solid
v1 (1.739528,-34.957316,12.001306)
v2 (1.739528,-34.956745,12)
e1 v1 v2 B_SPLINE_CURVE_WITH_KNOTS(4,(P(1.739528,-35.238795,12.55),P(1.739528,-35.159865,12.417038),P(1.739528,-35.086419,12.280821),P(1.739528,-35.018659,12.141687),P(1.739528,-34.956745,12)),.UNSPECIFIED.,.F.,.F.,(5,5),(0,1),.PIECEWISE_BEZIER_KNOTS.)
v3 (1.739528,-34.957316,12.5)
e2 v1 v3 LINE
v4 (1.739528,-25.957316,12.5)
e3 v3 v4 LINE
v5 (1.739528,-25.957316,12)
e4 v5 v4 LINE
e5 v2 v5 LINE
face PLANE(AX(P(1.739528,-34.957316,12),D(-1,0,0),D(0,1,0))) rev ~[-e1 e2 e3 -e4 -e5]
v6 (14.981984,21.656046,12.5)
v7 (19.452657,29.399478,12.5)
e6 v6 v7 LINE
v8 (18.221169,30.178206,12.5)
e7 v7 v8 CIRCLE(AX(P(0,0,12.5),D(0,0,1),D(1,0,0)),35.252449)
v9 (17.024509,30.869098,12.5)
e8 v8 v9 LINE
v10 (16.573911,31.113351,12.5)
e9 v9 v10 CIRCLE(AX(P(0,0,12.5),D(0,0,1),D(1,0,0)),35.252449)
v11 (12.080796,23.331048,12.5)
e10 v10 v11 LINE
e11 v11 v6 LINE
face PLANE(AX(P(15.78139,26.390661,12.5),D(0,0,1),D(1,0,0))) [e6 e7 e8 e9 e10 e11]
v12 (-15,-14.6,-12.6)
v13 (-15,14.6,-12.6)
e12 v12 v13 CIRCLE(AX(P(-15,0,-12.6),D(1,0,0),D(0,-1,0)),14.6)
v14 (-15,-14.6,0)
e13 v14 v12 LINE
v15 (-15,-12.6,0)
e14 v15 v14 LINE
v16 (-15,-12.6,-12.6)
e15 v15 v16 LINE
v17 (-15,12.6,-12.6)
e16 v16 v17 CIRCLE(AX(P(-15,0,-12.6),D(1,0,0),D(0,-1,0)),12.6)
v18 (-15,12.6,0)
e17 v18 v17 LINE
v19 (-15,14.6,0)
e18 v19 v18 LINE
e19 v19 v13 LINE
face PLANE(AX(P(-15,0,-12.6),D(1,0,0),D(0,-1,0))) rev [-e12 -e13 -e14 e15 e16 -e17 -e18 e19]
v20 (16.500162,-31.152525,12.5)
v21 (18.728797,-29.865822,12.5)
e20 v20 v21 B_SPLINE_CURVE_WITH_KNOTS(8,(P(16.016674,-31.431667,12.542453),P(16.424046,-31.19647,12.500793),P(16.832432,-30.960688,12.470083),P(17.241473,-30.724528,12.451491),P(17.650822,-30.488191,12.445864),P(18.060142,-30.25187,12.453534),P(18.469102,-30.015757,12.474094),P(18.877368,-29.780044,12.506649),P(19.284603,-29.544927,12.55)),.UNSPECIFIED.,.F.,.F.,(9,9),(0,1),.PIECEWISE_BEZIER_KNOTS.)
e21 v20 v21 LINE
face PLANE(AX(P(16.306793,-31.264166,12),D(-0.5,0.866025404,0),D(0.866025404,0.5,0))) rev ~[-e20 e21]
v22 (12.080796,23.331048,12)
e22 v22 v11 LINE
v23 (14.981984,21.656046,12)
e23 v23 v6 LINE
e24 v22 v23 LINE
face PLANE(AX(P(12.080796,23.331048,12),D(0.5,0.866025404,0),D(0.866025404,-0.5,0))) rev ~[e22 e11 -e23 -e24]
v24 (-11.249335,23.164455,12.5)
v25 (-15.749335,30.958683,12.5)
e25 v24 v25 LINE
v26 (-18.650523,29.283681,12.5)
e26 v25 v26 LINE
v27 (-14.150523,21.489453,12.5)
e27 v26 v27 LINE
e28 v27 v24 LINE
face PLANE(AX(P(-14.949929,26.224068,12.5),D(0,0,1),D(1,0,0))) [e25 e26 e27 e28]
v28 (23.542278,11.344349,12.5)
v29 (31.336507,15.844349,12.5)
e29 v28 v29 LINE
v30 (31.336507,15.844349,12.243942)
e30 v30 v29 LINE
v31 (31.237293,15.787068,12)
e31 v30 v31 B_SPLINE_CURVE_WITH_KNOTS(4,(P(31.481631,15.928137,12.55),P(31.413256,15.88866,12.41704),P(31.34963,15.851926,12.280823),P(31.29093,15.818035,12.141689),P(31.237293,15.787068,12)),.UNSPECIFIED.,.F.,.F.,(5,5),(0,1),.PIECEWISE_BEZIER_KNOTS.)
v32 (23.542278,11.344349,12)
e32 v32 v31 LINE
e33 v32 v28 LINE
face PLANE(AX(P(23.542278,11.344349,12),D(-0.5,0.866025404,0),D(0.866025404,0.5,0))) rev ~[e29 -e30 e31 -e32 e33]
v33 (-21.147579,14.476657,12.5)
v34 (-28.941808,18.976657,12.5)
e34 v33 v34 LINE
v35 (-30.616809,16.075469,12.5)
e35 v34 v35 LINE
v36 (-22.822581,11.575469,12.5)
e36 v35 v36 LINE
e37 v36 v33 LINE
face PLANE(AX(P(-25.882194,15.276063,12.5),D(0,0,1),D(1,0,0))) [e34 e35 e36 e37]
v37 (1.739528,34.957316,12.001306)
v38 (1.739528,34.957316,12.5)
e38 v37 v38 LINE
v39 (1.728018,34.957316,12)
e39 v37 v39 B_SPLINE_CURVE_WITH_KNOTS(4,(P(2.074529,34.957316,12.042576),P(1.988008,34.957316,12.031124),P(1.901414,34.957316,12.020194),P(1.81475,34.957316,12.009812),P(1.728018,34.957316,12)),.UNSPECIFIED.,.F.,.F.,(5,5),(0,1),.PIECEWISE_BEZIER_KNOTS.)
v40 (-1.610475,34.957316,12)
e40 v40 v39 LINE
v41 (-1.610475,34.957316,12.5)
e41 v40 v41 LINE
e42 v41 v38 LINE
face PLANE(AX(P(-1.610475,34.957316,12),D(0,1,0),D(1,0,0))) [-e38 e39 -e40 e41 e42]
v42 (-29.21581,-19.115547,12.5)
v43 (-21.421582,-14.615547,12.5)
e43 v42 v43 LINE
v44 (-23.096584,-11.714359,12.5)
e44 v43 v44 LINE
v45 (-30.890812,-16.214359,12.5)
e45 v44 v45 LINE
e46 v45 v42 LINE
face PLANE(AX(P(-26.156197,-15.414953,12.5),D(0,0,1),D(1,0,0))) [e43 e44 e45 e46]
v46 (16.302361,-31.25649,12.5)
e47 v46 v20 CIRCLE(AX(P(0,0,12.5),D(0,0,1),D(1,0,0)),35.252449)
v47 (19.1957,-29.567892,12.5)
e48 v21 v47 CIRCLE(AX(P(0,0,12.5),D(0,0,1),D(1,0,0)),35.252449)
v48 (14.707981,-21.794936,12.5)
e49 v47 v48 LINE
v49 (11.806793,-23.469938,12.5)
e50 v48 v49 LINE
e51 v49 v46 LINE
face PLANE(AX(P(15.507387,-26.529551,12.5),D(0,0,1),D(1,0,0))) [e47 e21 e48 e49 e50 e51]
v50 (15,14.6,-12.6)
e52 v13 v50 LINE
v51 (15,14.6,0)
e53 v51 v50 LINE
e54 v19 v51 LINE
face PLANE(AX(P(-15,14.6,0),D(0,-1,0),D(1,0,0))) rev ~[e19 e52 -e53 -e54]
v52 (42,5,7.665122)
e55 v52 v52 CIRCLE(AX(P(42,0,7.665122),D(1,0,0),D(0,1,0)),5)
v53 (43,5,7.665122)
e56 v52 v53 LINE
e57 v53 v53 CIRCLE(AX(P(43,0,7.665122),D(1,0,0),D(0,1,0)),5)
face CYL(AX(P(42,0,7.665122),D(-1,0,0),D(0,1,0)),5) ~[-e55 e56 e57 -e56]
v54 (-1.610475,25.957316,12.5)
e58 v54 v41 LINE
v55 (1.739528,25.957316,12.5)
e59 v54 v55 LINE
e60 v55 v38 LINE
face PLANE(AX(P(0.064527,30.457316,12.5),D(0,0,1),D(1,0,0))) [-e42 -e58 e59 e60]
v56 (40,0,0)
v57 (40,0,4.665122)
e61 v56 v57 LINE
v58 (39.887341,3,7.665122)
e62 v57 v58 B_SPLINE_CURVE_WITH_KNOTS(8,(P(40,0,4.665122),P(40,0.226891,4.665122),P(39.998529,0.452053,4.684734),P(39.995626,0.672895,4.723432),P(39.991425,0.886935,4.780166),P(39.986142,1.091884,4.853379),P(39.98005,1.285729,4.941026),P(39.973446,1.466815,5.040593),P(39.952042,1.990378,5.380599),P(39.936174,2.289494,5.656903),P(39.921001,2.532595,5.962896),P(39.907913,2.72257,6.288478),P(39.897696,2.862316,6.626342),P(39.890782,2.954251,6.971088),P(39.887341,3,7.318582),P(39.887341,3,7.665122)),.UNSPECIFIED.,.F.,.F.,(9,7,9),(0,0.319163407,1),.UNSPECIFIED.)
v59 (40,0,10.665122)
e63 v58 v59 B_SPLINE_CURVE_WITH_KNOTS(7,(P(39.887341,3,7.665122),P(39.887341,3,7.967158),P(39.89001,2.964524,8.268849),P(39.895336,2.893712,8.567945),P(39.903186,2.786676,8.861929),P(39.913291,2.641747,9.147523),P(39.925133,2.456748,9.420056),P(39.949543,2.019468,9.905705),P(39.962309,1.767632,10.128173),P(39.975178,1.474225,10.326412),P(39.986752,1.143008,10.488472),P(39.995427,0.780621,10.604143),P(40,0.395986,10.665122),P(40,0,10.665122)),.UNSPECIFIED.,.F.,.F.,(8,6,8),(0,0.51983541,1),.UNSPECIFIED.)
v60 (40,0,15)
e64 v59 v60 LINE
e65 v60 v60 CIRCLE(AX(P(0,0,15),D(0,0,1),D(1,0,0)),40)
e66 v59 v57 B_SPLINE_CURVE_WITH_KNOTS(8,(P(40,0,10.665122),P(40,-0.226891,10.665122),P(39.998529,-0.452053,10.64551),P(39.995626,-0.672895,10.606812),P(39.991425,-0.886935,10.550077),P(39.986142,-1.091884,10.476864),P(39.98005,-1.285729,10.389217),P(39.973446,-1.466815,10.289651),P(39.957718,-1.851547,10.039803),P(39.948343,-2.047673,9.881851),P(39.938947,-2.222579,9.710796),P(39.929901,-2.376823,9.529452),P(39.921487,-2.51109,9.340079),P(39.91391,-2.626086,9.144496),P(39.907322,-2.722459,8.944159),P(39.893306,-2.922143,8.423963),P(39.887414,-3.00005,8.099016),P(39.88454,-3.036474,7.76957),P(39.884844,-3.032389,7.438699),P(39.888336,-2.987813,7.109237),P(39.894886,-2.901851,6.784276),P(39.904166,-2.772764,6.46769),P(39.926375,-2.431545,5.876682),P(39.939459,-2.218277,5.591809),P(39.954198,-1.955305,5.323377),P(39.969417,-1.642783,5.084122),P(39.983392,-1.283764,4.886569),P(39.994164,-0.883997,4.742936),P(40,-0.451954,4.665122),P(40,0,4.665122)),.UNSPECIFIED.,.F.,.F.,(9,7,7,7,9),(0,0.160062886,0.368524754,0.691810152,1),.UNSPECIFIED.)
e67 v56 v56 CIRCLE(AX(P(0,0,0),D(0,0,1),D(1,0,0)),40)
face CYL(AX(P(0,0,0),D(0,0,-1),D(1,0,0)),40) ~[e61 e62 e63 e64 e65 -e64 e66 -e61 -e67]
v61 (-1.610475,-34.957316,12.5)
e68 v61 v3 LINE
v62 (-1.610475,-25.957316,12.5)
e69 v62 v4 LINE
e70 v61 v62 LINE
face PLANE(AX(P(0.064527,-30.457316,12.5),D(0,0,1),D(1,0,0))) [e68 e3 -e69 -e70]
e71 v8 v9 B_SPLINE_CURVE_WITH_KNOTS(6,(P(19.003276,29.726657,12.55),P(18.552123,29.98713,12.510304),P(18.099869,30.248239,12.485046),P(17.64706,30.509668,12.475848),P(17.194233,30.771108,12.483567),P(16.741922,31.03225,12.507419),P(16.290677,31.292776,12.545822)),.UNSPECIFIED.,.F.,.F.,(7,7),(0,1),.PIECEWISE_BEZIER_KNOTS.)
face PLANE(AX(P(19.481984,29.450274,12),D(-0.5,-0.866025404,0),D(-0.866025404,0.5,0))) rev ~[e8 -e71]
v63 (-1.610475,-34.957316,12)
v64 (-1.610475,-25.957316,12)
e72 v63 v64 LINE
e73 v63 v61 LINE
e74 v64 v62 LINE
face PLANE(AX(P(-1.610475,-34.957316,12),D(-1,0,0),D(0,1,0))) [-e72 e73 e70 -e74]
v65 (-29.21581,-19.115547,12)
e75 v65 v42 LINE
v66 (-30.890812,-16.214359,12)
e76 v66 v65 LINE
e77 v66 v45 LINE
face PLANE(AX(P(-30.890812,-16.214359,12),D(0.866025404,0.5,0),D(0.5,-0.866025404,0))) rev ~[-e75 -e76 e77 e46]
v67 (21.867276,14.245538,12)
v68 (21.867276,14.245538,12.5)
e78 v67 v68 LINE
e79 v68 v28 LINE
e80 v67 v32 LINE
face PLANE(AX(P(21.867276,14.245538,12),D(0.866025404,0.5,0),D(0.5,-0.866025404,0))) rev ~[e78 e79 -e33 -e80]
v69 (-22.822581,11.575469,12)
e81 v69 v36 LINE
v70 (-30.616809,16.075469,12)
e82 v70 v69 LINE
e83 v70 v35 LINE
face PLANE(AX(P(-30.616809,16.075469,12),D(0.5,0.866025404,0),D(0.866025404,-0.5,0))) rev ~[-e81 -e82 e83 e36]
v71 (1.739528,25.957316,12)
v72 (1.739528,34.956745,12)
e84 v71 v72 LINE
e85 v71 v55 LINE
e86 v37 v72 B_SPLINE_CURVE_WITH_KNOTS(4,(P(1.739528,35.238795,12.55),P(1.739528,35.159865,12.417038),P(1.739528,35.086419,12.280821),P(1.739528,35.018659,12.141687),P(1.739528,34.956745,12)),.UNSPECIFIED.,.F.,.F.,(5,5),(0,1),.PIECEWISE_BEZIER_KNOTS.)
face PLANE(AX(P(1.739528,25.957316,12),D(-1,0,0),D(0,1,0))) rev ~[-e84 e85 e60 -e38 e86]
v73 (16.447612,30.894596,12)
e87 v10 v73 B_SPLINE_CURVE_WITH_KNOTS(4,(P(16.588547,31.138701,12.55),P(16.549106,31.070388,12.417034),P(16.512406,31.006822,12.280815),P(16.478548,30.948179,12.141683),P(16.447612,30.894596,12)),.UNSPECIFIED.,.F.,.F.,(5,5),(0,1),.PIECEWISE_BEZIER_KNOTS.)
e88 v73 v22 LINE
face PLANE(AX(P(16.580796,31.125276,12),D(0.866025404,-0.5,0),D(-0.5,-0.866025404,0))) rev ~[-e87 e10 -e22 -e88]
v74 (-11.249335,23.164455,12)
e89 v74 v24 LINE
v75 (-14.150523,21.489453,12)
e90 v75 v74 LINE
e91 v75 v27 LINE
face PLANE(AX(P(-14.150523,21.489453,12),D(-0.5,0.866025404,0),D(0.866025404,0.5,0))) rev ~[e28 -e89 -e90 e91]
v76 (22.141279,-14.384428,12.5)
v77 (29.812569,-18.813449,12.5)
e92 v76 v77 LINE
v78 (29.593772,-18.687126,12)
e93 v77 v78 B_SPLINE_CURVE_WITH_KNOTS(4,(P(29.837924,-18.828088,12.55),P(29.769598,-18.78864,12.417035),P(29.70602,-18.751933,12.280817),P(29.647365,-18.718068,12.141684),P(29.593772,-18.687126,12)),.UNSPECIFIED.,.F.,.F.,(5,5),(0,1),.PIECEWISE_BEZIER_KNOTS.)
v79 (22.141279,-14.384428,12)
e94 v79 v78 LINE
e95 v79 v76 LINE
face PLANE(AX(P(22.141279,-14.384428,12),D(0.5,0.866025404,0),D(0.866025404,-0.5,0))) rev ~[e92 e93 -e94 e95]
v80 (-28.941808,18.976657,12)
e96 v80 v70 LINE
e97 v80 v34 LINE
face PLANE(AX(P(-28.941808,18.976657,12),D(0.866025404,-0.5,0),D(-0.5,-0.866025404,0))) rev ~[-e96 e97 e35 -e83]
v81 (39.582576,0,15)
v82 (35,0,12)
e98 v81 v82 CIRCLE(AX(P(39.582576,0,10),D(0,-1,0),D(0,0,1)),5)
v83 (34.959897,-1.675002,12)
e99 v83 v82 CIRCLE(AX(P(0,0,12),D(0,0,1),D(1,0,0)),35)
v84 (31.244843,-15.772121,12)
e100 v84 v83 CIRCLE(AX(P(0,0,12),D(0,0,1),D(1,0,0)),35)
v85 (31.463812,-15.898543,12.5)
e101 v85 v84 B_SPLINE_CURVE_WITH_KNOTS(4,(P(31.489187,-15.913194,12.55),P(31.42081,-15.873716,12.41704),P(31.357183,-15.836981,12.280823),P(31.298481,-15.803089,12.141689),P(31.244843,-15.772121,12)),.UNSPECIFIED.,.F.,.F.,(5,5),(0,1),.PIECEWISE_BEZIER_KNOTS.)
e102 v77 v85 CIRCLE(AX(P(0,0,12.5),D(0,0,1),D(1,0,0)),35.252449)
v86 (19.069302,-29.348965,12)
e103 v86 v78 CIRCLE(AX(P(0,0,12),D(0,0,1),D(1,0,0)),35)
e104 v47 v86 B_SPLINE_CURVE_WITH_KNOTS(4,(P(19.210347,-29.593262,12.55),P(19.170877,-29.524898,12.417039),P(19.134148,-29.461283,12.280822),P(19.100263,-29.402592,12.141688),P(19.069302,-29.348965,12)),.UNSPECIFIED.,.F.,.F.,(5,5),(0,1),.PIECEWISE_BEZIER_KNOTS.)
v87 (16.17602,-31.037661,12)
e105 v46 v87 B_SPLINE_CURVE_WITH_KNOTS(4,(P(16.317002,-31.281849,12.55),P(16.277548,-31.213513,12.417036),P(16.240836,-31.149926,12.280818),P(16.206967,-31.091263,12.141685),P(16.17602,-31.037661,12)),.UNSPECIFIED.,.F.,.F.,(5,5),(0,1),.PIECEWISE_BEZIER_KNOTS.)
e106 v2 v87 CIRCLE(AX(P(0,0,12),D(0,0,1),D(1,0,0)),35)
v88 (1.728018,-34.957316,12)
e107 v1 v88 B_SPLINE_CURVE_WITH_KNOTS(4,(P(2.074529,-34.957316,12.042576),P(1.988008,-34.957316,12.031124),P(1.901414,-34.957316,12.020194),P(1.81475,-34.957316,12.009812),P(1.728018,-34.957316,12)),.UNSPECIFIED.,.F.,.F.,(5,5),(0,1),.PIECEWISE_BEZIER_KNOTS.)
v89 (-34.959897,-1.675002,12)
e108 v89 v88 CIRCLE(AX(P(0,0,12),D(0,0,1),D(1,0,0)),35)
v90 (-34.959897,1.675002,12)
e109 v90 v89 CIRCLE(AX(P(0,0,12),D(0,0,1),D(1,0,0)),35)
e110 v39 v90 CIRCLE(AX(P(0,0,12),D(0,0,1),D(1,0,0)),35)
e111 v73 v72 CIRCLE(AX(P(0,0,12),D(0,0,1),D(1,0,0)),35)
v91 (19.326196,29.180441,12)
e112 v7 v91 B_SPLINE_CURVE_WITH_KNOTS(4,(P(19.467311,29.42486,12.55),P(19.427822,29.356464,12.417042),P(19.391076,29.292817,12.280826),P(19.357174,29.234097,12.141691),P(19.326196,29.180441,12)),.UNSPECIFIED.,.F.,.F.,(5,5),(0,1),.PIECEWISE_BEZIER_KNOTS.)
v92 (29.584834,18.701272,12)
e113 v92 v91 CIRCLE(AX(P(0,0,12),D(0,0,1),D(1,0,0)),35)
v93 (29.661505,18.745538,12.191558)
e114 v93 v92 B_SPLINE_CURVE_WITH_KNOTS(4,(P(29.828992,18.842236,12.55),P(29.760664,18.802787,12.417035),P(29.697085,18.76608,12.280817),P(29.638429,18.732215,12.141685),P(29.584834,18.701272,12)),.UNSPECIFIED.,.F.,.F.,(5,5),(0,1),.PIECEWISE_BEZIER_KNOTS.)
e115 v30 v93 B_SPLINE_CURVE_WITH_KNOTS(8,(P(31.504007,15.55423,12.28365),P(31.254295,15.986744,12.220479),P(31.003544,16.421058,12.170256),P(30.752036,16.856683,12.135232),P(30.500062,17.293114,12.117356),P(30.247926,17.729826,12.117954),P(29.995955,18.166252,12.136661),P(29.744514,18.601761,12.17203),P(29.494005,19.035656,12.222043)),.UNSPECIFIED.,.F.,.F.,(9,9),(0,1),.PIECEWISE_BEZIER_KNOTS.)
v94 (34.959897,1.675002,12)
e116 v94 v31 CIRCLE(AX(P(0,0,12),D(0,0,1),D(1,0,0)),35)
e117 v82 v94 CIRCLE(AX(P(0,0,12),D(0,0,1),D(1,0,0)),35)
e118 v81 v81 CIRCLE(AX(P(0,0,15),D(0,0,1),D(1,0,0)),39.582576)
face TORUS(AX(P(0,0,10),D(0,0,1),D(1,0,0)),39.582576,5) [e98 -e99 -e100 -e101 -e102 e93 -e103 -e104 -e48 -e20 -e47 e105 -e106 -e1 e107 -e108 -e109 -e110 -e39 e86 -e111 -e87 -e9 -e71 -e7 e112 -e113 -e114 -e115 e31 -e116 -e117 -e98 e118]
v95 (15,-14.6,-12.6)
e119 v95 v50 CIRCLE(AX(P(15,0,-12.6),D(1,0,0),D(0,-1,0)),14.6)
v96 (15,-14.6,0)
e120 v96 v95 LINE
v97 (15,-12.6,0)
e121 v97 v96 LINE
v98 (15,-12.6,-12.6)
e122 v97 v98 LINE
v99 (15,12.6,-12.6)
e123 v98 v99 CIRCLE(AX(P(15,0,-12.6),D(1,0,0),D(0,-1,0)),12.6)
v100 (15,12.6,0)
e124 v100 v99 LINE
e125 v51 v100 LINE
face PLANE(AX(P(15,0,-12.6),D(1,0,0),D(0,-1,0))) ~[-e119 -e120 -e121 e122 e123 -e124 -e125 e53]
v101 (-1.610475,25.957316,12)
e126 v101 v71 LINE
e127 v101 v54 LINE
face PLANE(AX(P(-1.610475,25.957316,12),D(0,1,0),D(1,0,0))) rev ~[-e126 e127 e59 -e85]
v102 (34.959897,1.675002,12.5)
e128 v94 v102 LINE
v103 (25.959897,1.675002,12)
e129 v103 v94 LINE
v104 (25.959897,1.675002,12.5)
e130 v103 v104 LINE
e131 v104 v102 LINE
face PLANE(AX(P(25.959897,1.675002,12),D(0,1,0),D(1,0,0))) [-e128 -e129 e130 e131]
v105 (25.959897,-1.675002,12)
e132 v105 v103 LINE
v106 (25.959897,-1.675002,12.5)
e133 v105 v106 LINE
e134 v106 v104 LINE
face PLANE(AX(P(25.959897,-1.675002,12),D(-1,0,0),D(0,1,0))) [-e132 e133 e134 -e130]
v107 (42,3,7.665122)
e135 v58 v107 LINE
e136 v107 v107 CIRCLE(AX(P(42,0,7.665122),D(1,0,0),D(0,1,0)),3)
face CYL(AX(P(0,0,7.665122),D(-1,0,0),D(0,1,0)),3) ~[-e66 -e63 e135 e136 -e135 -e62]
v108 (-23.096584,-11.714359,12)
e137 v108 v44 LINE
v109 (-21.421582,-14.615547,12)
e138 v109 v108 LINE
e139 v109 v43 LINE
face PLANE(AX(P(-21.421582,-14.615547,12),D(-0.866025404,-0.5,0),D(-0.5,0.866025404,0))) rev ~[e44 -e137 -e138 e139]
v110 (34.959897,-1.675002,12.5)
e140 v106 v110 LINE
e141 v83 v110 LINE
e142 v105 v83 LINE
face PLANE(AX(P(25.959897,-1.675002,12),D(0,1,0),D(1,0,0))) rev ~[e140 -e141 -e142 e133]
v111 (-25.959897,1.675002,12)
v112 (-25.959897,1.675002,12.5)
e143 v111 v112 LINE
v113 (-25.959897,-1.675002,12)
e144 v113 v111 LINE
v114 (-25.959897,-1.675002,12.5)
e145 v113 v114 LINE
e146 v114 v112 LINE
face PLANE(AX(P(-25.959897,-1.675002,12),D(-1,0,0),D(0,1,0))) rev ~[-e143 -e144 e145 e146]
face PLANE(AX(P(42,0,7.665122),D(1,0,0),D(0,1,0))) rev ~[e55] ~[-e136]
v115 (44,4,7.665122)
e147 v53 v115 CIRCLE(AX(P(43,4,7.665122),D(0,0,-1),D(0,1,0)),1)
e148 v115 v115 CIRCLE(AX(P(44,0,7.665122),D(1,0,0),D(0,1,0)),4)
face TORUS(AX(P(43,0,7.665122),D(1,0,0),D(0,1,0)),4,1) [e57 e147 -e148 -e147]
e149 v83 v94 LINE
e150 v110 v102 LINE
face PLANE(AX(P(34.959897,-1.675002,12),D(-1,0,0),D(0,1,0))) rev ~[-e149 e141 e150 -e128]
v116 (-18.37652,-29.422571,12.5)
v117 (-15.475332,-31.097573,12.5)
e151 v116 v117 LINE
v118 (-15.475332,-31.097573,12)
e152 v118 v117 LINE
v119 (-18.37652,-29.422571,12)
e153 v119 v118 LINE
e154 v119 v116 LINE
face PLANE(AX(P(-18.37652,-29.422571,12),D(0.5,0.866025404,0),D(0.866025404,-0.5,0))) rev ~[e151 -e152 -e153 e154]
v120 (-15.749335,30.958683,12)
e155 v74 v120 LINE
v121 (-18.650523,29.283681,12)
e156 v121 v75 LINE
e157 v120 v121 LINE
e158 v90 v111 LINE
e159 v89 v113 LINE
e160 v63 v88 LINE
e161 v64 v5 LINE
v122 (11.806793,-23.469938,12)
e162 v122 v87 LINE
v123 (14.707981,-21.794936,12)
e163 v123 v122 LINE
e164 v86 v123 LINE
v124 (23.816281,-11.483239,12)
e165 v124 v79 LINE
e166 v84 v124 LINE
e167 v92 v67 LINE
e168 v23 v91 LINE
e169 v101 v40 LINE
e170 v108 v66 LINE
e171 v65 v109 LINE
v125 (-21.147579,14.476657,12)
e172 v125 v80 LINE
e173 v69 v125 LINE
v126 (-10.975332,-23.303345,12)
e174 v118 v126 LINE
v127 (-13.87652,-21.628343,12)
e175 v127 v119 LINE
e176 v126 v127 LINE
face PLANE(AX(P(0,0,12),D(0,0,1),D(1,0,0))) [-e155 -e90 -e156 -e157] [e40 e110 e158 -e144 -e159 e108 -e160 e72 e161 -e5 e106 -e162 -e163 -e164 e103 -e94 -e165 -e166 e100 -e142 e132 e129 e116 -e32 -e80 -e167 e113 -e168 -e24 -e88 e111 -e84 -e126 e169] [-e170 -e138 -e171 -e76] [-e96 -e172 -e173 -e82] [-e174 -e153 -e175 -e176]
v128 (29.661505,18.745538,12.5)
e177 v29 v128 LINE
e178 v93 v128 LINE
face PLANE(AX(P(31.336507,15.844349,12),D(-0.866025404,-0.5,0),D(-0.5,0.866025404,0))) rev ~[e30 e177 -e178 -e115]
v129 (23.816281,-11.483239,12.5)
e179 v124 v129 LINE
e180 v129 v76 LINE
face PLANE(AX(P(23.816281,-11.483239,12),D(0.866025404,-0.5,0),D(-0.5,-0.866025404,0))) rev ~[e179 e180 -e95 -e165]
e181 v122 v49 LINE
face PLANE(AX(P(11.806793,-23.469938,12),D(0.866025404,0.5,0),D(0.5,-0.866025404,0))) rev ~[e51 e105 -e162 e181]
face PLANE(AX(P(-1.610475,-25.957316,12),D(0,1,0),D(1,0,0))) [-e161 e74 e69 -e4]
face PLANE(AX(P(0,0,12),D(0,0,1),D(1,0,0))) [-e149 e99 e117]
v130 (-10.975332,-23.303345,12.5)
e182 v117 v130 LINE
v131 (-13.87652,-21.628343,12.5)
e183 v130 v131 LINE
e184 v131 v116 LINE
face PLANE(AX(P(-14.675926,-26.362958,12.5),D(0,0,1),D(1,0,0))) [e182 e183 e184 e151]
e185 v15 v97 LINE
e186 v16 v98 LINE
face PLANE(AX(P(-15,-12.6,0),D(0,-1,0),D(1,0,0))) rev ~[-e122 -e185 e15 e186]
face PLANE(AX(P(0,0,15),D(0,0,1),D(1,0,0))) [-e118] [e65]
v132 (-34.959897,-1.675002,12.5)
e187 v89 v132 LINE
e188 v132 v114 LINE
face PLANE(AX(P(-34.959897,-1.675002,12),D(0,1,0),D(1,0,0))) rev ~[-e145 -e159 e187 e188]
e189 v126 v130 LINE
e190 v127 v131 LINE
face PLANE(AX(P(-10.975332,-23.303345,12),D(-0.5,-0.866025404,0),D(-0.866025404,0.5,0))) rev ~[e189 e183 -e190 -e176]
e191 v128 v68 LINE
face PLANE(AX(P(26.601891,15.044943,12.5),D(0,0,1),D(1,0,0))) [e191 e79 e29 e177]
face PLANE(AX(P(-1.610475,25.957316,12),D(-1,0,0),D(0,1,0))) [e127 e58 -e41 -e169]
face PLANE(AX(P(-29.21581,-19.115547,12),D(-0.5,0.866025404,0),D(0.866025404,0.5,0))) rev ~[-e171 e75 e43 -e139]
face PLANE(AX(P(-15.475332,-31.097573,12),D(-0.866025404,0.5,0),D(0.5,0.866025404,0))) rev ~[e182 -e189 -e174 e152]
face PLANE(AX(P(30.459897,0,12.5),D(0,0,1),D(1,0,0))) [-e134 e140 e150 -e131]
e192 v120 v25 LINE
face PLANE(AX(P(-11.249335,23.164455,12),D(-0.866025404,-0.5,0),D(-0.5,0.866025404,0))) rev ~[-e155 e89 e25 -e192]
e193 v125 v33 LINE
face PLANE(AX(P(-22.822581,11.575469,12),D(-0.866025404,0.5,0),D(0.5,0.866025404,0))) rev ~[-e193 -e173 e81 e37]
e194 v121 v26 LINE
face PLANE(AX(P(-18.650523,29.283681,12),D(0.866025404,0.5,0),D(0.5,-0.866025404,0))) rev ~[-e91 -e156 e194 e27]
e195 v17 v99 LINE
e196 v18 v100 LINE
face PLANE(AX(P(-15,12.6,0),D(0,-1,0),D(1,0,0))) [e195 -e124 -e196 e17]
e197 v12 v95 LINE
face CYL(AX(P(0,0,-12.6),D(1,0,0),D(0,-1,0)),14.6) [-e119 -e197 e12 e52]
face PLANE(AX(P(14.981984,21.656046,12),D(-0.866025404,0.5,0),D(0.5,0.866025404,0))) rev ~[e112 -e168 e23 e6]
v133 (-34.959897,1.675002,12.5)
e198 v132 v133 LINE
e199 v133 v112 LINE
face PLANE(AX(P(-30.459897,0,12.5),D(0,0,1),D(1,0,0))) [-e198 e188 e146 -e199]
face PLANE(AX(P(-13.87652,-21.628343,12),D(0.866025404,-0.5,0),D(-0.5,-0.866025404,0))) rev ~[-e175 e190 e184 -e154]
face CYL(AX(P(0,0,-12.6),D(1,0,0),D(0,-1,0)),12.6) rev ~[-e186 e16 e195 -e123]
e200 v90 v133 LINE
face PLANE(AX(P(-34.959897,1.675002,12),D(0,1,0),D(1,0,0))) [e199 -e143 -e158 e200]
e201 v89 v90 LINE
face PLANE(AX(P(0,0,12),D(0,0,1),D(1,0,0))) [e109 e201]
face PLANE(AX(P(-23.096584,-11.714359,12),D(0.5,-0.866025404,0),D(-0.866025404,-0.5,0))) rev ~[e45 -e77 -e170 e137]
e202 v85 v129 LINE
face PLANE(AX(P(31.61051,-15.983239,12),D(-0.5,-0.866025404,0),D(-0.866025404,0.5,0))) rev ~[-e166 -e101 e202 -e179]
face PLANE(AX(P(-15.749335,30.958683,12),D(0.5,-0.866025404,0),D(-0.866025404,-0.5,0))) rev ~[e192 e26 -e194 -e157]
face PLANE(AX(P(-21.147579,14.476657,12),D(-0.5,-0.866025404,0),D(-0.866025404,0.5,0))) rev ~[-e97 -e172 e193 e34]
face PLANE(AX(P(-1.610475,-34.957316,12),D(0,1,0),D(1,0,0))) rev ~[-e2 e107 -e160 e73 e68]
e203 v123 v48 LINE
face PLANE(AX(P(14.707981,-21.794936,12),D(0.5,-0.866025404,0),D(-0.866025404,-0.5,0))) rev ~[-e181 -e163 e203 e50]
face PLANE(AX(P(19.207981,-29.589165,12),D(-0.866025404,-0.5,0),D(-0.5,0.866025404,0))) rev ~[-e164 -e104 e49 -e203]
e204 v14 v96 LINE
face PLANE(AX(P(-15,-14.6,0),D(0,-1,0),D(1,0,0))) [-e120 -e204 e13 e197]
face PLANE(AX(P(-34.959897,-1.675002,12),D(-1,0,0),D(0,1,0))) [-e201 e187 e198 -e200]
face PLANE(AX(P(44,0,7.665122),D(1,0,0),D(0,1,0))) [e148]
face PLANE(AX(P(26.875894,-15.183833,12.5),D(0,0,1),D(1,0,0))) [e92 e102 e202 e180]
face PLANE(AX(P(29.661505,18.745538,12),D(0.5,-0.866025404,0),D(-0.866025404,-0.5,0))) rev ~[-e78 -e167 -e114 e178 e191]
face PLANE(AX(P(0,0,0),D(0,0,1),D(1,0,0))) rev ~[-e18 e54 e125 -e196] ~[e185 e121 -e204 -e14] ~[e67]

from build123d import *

# Parameters (mm, degrees)
F0_R      = 40
F0_R_2    = 35
F1_DEPTH  = 15
F2_R      = 35
F3_DEPTH  = 12
F5_R      = 3
F6_DEPTH  = 42
F7_R      = 5
F8_DEPTH  = 2
F9_R      = 1
F11_W     = 9
F11_H     = 3.350003619
F11_W_2   = 3.350003619
F11_H_2   = 9
F12_DEPTH = 0.5
F13_W     = 30
F13_H     = 2
F14_DEPTH = 12.6
F15_W     = 30
F15_H     = 2
F16_ANGLE = 180


# Not quite as in the source:
# - a fillet or chamfer that OpenCascade refuses, or shapes differently, is made with other operations: its cross-section is extruded or revolved along the edge and cut away or added


with BuildPart() as f1:
    # F0 (on Top) → F1 (new body)
    with BuildSketch(Plane.XY):
        Circle(F0_R)
        Circle(F0_R_2, mode=Mode.SUBTRACT)
    extrude(amount=F1_DEPTH)

    # F2 (on Top) → F3 (join)
    with BuildSketch(Plane.XY):
        Circle(F2_R)
    extrude(amount=F3_DEPTH)

    # F4: fillet of radius 5 on 1 edges, made by hand

    # F4_s1 → F4_t2 (revolve, cut)
    with BuildSketch(Plane.XZ):
        with BuildLine():
            ThreePointArc((39.582575695, 15), (36.8439629074, 14.1833001327), (35, 12))
            Line((35, 12), (35, 15))
            Line((35, 15), (39.582575695, 15))
        make_face()
    revolve(axis=Axis((0, 0, 15), (0, 0, 1)), mode=Mode.SUBTRACT)

    # F5 (on Right) → F6 (join)
    with BuildSketch(Plane.YZ):
        with Locations((0, 7.6651219279)):
            Circle(F5_R)
    extrude(amount=F6_DEPTH)

    # F7 (on face) → F8 (join)
    with BuildSketch(Plane.YZ.offset(42)):
        with Locations((0, 7.6651219279)):
            Circle(F7_R)
    extrude(amount=F8_DEPTH)

    # F9
    f9_edges = [f1.edges().sort_by_distance(p)[0] for p in [
        (44, -5, 7.665122),
    ]]
    fillet(f9_edges, radius=F9_R)

    # F11 (on face) → F12 (join)
    with BuildSketch(Plane.XY.offset(12)):
        with Locations((30.4598965808, 0)):
            Rectangle(F11_W, F11_H)
        with Locations((-30.4598965808, 0)):
            Rectangle(F11_W, F11_H)
        with Locations((0.064526599, 30.4573161602)):
            Rectangle(F11_W_2, F11_H_2)
        with Locations((0.064526599, -30.4573161602)):
            Rectangle(F11_W_2, F11_H_2)
        Polygon((29.9355077939, -18.884427597), (31.6105096033, -15.9832393602), (23.8162809693, -11.4832393602), (22.1412791598, -14.384427597), align=None)
        Polygon((-21.1475788678, 14.4766572205), (-28.9418075019, 18.9766572205), (-30.6168093114, 16.0754689837), (-22.8225806773, 11.5754689837), align=None)
        Polygon((19.4819840184, 29.4502744503), (16.5807957816, 31.1252762598), (12.0807957816, 23.3310476258), (14.9819840184, 21.6560458163), align=None)
        Polygon((-10.9753321418, -23.3033446013), (-13.8765203786, -21.6283427918), (-18.3765203786, -29.4225714259), (-15.4753321418, -31.0975732354), align=None)
        Polygon((31.3365066639, 15.8443492635), (29.6615048544, 18.7455375003), (21.8672762203, 14.2455375003), (23.5422780298, 11.3443492635), align=None)
        Polygon((-23.0965836168, -11.7143590805), (-30.8908122509, -16.2143590805), (-29.2158104414, -19.1155473173), (-21.4215818073, -14.6155473173), align=None)
        Polygon((-15.7493350812, 30.9586831386), (-18.650523318, 29.2836813291), (-14.150523318, 21.489452695), (-11.2493350812, 23.1644545045), align=None)
        Polygon((14.707981079, -21.7949359131), (11.8067928422, -23.4699377226), (16.3067928422, -31.2641663566), (19.207981079, -29.5891645471), align=None)
    extrude(amount=F12_DEPTH)

    # F13 (on face) → F14 (join)
    with BuildSketch(Plane(origin=(0, 0, 0), x_dir=(1, 0, 0), z_dir=(0, 0, -1))):
        with Locations((0, -13.6)):
            Rectangle(F13_W, F13_H)
        with Locations((0, 13.6)):
            Rectangle(F13_W, F13_H)
    extrude(amount=F14_DEPTH)

    # F15 (on face) → F16 (revolve)
    with BuildSketch(Plane(origin=(0, 0, -12.6), x_dir=(1, 0, 0), z_dir=(0, 0, -1))):
        with Locations((0, 13.6)):
            Rectangle(F15_W, F15_H)
    revolve(axis=Axis((9.313e-07, 0, -12.6), (1, 0, 0)), revolution_arc=F16_ANGLE)


solid = f1.part
